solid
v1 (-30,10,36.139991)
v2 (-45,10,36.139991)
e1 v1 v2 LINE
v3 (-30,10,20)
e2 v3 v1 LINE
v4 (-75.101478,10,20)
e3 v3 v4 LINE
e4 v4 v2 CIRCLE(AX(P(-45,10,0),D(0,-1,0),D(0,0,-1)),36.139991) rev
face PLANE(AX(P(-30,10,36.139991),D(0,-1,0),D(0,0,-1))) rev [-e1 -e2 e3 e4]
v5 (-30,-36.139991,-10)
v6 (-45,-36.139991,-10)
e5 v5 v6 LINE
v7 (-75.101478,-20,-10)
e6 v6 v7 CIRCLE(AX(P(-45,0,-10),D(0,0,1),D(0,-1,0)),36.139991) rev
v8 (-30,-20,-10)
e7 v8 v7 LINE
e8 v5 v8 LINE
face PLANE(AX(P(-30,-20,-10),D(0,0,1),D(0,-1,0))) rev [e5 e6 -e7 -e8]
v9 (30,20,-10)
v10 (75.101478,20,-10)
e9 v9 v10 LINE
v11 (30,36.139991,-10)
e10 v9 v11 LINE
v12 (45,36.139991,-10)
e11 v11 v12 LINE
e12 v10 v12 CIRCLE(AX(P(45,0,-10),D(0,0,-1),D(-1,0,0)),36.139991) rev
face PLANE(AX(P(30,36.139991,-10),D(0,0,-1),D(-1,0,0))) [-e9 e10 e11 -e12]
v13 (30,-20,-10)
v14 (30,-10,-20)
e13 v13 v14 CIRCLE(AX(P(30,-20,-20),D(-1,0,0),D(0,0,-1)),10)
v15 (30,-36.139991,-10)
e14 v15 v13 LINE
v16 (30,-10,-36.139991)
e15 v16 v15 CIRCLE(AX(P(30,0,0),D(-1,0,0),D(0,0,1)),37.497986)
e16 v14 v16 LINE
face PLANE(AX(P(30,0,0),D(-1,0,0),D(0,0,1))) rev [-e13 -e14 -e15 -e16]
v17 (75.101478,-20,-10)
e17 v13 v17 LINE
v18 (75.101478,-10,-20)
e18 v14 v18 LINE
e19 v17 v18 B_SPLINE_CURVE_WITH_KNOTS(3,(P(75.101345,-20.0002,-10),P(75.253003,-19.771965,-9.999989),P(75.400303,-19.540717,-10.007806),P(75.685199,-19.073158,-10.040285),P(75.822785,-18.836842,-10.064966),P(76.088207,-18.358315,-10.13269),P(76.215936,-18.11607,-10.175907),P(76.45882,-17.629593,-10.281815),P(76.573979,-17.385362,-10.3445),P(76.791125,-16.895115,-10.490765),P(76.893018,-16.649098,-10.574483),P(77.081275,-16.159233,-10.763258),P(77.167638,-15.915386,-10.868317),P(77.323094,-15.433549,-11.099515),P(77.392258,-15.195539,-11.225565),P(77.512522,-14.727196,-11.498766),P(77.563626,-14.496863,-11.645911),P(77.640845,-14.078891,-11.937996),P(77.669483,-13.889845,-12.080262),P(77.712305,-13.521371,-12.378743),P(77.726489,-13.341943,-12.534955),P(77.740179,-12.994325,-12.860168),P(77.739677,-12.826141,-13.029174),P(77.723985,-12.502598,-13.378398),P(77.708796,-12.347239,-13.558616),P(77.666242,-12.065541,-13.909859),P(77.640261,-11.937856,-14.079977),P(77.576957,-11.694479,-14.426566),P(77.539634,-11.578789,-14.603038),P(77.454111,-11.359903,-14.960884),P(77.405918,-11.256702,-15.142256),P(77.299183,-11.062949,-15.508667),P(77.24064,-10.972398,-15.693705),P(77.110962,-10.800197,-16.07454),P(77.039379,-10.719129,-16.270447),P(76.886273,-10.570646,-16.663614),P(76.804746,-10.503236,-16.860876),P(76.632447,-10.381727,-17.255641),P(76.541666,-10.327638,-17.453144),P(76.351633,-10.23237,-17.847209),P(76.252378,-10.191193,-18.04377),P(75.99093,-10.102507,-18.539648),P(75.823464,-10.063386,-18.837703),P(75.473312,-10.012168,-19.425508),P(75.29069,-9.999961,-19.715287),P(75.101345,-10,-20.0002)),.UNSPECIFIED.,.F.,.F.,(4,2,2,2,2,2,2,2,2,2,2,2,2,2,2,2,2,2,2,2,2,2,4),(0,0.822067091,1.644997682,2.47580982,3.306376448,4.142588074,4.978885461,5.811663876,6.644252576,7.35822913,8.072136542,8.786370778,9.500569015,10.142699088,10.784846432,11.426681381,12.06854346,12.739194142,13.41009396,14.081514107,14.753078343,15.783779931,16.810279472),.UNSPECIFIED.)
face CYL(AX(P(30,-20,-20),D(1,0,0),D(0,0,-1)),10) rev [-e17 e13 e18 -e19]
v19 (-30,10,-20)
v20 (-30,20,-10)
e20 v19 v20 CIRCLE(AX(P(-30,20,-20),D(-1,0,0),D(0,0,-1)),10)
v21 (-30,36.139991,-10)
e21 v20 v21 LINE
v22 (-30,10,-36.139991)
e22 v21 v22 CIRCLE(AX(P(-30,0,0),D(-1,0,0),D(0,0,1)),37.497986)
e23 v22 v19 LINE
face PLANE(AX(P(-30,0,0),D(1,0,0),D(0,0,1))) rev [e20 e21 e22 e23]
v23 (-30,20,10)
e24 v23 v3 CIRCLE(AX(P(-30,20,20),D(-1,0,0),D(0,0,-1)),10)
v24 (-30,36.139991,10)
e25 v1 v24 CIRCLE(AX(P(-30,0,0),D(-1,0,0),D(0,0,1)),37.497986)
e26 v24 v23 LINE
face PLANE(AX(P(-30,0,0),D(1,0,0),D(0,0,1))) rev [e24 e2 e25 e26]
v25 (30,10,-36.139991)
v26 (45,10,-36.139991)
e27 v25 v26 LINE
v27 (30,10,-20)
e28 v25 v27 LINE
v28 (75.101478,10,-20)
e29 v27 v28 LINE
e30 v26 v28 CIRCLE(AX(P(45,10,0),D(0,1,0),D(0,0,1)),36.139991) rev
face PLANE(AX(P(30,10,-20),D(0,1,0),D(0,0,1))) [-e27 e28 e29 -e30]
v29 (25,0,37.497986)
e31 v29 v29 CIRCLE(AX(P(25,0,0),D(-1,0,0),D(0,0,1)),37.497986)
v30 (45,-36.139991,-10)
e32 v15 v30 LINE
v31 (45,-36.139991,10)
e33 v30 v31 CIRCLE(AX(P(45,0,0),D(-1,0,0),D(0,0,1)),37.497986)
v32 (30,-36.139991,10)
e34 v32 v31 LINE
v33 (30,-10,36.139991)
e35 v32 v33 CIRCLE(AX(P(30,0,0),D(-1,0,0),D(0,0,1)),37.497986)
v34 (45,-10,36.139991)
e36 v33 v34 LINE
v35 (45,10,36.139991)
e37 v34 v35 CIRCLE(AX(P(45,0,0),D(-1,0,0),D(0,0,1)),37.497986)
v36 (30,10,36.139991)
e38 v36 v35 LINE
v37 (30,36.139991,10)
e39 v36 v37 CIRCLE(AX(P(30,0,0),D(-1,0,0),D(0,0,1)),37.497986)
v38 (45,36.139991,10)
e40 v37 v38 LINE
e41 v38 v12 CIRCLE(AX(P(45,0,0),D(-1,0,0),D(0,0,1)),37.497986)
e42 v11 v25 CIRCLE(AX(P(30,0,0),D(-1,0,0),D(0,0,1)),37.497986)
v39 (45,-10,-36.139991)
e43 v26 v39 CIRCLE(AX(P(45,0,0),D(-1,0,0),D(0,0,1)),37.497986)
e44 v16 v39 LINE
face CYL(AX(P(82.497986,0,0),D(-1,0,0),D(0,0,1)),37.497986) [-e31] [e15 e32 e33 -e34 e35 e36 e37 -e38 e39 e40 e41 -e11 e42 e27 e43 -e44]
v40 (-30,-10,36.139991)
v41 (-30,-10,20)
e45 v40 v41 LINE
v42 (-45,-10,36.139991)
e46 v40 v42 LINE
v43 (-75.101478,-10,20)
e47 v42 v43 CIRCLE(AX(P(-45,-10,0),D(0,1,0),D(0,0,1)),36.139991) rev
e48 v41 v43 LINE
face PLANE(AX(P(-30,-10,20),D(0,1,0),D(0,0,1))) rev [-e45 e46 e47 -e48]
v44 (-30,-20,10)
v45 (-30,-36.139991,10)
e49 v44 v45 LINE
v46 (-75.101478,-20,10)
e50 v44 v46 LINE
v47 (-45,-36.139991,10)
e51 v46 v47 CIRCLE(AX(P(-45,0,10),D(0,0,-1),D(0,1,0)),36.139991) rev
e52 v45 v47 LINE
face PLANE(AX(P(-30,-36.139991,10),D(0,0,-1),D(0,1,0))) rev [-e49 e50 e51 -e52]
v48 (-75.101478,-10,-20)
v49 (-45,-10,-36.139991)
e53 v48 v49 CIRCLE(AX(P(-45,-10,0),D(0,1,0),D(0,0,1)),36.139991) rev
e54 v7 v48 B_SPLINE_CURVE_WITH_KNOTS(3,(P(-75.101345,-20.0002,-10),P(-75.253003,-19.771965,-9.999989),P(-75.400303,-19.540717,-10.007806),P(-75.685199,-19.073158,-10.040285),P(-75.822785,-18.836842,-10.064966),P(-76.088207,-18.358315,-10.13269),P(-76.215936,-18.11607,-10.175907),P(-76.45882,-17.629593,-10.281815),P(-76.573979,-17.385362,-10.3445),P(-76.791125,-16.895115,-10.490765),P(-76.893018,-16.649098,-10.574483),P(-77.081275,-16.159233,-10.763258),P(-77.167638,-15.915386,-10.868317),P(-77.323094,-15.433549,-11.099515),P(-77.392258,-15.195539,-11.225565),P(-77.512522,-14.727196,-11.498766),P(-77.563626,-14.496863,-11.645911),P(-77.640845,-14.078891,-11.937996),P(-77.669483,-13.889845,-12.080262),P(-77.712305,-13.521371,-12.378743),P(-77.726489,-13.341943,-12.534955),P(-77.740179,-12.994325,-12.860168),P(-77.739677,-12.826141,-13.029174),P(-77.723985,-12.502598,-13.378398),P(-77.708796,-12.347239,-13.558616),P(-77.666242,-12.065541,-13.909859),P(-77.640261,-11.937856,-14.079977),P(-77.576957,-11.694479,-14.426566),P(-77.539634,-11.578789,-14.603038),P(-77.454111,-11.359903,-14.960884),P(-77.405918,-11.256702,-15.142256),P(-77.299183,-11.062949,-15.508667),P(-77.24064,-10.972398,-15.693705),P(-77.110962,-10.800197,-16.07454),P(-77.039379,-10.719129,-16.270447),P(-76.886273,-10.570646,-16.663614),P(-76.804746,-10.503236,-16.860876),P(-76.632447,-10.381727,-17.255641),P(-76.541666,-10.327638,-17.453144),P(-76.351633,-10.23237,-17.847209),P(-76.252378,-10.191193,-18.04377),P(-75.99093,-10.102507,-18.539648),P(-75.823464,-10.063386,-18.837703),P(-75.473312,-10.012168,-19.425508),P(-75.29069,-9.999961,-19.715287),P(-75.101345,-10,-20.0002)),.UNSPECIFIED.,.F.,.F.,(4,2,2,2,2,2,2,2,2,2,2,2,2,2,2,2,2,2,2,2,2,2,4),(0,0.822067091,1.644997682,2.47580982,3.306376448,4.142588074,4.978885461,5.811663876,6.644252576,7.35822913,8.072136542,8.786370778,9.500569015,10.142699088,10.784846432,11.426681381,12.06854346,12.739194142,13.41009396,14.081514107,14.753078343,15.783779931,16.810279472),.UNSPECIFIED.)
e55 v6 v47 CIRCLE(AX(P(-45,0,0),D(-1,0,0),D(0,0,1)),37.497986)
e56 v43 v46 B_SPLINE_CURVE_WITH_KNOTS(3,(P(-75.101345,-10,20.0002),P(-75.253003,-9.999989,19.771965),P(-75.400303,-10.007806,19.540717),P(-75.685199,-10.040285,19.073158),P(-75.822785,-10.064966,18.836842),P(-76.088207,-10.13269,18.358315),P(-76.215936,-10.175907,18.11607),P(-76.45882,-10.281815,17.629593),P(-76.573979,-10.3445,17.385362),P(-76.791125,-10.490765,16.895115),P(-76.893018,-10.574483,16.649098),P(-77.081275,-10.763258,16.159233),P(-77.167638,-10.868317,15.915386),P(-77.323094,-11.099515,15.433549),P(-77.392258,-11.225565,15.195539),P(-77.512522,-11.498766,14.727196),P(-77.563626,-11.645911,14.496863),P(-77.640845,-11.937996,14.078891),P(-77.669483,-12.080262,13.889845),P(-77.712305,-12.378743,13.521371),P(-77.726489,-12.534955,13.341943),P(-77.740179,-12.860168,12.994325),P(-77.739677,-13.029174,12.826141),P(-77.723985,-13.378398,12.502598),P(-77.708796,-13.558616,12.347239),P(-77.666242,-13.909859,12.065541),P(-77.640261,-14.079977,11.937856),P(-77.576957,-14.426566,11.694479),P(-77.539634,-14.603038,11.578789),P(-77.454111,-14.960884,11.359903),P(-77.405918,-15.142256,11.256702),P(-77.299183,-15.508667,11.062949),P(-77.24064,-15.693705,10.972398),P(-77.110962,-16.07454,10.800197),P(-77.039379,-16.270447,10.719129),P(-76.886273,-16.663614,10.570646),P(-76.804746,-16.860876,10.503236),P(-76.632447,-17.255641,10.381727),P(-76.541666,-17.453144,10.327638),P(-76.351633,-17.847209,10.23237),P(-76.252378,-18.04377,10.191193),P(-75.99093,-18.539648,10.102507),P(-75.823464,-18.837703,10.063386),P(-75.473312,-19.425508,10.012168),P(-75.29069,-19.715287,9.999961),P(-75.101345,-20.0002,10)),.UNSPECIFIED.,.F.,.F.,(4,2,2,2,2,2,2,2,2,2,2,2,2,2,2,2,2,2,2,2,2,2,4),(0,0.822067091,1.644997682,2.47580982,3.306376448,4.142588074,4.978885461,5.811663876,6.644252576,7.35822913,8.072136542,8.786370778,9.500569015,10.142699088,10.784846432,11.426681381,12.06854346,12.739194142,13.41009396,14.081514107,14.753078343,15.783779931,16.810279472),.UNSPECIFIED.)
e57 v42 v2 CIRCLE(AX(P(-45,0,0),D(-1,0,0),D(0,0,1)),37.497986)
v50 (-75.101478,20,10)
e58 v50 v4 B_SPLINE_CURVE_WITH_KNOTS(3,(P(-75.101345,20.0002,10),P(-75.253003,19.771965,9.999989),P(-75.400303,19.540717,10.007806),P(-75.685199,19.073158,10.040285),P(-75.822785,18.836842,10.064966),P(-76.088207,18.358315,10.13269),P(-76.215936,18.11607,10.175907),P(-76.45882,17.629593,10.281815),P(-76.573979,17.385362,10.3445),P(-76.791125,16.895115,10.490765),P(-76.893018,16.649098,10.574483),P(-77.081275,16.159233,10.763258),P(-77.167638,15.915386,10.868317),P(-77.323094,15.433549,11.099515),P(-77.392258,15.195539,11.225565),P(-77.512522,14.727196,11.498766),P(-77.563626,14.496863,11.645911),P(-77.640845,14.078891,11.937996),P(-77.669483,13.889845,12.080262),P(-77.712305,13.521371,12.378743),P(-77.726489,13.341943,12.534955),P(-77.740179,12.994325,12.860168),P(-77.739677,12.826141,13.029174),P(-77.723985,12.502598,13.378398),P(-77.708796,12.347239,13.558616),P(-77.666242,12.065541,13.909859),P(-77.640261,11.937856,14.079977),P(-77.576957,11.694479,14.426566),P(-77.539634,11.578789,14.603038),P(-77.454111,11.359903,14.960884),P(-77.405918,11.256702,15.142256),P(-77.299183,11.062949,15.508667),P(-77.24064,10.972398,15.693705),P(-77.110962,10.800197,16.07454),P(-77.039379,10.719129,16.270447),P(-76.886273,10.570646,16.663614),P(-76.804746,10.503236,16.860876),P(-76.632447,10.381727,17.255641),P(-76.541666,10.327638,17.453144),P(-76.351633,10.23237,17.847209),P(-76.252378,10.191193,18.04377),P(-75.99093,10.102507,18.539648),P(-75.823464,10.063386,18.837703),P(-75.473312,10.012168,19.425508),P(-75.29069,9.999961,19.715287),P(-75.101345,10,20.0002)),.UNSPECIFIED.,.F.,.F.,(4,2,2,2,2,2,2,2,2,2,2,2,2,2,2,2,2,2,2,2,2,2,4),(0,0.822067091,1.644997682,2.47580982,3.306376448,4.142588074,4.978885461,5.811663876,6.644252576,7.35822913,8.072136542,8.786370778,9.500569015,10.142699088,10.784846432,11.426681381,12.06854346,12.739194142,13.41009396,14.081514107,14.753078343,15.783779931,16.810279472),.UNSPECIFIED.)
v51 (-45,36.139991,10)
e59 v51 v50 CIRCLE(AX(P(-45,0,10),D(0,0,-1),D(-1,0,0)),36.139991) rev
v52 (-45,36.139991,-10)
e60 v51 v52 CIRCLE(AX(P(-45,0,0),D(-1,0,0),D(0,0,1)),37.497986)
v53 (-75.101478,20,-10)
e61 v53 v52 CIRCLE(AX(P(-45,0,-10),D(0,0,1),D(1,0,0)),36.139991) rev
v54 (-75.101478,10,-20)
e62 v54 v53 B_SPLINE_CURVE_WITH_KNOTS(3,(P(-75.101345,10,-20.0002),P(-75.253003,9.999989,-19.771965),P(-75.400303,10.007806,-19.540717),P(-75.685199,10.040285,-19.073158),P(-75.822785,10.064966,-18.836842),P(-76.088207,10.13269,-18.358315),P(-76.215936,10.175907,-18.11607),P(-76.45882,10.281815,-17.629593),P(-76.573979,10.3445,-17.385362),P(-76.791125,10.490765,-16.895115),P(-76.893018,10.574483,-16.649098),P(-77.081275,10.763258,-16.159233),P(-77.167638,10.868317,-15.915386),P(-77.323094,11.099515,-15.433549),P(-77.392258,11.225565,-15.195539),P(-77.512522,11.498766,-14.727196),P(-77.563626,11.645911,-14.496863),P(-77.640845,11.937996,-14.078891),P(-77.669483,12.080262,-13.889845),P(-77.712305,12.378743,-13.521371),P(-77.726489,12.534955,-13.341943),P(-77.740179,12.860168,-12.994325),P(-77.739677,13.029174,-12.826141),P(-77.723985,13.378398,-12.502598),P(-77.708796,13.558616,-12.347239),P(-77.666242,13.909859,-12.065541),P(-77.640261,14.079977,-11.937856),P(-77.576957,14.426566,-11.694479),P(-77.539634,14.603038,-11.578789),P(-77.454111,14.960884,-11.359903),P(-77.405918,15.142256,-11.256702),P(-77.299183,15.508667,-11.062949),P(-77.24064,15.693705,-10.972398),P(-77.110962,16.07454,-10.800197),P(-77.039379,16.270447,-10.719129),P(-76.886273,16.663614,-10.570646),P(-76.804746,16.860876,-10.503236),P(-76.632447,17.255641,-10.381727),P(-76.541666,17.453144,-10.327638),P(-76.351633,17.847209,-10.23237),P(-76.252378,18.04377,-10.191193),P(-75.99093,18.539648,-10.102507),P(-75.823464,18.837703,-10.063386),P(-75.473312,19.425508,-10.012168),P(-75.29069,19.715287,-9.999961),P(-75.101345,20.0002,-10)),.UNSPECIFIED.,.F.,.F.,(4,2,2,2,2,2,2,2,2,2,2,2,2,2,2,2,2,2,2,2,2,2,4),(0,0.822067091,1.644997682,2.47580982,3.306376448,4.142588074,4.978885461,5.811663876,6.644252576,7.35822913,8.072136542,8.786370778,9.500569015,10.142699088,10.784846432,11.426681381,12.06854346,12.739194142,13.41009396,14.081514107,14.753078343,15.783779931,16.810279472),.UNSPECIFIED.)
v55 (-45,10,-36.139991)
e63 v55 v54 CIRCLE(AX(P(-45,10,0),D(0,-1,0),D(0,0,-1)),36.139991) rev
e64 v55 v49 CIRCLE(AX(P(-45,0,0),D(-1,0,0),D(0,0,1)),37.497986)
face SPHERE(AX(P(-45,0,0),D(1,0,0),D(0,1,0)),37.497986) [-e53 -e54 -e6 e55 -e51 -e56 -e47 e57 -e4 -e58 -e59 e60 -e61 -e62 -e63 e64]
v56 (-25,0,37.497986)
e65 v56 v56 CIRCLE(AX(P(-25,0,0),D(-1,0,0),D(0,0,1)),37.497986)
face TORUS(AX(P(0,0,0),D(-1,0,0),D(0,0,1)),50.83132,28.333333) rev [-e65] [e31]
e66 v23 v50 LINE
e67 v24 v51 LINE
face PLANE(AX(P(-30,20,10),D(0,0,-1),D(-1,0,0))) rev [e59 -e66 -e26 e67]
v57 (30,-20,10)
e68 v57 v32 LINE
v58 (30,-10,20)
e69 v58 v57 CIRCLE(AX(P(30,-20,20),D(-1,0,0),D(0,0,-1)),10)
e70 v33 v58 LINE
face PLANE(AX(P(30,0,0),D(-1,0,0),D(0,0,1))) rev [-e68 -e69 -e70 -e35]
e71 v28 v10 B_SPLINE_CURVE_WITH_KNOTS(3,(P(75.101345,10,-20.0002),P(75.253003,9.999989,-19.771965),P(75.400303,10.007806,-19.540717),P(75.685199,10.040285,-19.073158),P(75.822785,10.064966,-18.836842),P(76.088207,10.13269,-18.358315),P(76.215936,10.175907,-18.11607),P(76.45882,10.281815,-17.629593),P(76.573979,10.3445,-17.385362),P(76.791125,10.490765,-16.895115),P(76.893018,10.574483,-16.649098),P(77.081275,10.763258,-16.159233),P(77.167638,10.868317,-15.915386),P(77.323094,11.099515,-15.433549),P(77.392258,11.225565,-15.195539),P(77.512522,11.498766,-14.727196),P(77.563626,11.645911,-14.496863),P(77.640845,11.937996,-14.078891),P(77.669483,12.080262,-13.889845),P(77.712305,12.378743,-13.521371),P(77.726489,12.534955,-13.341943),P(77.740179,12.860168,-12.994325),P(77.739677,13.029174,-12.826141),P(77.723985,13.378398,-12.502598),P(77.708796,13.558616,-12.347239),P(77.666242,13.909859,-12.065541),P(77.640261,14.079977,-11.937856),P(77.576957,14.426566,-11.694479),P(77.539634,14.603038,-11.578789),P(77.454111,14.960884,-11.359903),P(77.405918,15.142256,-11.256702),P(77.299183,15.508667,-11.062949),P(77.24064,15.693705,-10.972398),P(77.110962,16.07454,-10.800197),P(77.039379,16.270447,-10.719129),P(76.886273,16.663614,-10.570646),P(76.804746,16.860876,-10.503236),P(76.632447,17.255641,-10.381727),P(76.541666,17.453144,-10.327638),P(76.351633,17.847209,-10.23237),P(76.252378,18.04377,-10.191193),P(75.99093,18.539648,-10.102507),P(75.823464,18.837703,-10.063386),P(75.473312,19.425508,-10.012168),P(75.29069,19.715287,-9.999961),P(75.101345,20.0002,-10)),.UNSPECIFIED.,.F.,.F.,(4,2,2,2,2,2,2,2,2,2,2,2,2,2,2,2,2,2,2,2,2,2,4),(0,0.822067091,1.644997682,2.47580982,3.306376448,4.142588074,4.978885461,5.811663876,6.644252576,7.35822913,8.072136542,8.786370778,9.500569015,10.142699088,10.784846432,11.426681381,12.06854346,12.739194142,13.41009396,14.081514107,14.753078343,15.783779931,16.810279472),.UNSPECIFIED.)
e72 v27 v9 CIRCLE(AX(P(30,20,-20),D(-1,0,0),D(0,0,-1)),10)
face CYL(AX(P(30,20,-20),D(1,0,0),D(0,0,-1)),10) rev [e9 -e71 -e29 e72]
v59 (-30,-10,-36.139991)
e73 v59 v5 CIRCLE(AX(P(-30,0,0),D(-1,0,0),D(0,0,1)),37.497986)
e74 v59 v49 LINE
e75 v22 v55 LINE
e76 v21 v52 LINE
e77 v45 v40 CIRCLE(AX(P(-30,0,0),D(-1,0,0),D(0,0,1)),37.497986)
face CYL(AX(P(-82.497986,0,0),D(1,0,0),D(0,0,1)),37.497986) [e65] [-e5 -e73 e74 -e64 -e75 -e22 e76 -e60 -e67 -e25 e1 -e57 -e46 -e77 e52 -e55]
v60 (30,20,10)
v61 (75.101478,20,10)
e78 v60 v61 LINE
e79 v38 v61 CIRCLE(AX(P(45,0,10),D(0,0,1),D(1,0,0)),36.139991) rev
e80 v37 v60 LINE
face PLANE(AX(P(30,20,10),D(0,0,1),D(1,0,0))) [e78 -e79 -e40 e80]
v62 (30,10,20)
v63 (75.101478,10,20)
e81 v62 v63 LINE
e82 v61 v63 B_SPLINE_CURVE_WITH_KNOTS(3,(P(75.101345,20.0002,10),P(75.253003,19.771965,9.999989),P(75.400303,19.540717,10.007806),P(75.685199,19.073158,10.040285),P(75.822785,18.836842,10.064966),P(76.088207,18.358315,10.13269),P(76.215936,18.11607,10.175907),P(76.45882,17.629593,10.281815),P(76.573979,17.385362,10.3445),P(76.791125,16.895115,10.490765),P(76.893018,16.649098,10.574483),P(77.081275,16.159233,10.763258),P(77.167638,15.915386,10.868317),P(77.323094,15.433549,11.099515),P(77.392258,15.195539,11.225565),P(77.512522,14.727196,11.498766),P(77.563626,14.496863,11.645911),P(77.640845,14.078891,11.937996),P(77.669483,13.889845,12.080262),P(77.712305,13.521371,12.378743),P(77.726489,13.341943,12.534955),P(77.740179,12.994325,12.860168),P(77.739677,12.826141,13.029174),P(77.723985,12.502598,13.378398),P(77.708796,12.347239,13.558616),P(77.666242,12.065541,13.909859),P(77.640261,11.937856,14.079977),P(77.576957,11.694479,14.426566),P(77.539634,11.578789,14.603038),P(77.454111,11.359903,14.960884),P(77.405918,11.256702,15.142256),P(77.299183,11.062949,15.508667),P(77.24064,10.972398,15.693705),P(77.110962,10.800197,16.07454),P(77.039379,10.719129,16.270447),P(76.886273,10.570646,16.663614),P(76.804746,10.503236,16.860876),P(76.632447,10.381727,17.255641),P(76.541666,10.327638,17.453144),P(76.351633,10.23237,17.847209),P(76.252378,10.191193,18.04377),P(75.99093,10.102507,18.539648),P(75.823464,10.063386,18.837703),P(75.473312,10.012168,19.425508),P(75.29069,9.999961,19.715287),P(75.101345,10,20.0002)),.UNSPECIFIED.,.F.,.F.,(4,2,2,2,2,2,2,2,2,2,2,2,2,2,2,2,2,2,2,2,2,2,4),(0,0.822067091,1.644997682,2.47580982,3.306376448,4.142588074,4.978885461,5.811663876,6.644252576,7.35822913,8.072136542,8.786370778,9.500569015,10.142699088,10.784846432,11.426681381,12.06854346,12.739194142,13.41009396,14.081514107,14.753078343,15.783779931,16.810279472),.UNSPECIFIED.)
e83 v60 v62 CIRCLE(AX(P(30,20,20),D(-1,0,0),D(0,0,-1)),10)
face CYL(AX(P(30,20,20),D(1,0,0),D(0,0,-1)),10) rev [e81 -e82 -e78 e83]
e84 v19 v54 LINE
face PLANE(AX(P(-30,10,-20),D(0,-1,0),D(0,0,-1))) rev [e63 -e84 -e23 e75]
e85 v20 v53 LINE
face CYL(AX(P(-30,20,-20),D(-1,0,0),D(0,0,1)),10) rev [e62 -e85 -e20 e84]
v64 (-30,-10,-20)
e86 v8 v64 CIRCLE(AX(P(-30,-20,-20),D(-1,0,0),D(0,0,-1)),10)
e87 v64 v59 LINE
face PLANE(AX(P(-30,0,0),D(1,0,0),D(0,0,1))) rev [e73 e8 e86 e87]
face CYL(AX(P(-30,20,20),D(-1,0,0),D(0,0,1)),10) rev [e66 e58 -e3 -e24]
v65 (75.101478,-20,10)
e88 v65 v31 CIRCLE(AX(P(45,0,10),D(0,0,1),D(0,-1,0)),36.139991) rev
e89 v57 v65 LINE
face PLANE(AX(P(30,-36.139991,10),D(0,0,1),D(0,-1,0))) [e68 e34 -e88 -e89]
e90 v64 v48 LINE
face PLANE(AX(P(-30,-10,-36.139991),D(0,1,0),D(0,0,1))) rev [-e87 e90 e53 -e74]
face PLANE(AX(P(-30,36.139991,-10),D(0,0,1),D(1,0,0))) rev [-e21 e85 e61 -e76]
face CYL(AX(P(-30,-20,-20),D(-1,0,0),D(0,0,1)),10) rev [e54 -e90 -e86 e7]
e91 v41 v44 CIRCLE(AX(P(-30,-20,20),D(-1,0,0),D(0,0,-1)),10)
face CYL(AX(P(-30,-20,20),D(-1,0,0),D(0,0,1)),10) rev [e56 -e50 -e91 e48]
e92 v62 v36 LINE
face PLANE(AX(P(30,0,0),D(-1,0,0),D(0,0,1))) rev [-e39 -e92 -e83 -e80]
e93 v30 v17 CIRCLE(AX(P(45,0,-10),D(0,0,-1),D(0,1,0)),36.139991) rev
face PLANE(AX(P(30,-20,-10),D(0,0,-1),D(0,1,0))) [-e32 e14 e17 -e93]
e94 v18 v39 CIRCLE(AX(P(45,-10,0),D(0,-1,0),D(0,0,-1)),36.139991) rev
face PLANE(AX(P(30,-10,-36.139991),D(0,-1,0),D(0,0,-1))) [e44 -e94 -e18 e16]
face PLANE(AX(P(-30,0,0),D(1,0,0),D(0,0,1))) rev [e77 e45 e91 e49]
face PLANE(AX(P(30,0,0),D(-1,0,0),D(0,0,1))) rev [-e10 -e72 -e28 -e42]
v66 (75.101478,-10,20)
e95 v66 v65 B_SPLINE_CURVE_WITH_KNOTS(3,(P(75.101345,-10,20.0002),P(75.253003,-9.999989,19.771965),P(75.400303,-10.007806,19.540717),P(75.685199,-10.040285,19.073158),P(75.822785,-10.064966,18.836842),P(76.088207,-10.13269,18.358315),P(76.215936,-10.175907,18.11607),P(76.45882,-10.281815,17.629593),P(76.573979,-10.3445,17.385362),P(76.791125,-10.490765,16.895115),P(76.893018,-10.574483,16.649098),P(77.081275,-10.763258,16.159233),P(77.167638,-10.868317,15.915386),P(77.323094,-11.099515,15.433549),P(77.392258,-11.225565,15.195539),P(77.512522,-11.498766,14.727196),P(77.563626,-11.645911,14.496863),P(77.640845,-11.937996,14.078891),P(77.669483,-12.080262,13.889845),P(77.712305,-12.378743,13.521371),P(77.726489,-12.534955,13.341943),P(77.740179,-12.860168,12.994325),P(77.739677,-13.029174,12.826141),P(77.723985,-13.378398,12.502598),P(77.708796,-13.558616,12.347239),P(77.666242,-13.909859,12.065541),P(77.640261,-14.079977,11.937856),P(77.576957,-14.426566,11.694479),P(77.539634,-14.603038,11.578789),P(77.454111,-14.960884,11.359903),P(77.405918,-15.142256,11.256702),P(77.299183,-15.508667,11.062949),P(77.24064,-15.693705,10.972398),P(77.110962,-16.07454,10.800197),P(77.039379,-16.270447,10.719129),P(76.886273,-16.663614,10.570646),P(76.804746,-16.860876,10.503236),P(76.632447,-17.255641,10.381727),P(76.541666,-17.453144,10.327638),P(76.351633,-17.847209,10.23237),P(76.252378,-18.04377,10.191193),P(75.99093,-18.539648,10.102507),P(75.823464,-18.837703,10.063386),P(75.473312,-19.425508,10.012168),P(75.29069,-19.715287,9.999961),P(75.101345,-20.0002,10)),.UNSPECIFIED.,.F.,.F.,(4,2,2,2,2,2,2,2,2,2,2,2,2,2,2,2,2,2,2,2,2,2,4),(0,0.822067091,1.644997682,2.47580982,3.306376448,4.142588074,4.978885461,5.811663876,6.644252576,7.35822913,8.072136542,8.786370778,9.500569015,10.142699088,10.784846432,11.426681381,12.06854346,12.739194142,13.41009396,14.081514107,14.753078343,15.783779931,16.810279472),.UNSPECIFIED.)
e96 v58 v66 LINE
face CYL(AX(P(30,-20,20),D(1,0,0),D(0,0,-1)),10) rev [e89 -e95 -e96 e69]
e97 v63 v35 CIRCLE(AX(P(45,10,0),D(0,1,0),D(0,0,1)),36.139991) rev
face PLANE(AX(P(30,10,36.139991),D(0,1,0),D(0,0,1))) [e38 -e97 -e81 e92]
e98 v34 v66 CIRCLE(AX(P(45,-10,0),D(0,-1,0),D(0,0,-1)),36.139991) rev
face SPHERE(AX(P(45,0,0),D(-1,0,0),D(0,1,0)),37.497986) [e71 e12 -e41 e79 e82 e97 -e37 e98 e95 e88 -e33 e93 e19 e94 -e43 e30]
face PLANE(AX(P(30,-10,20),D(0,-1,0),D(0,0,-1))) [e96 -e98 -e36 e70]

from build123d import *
from build123d.topology import SkipClean

# Parameters (mm, degrees)
CUT_EXTRUDE_START   = -30
CUT_EXTRUDE_1_DEPTH = 52.5


with BuildPart() as part:
    # 草图1 → 旋转3 (revolve)
    with BuildSketch(Plane.XY):
        with BuildLine():
            Line((0, 0), (82.497986241, 0))
            ThreePointArc((82.497986241, 0), (71.515080352, 26.515080352), (45, 37.497986241))
            Line((45, 37.497986241), (25, 37.497986241))
            ThreePointArc((25, 37.497986241), (14.577379737, 26.535686679), (0, 22.497986241))
            Line((0, 22.497986241), (0, 0))
        make_face()
    revolve_3 = revolve(axis=Axis((82.497986241, 0, 0), (1, 0, 0)))

    # 草图2 → 切除-拉伸1 (cut)
    with BuildSketch(Plane.ZY.offset(CUT_EXTRUDE_START)):
        with BuildLine():
            Line((-10, 36.139991314), (-10, 20))
            ThreePointArc((-10, 20), (-12.928932188, 12.928932188), (-20, 10))
            Line((-20, 10), (-36.139991314, 10))
            ThreePointArc((-36.139991314, 10), (-26.515080352, 26.515080352), (-10, 36.139991314))
        make_face()
        with BuildLine():
            Line((36.139991314, 10), (20, 10))
            ThreePointArc((20, 10), (12.928932188, 12.928932188), (10, 20))
            Line((10, 20), (10, 36.139991314))
            ThreePointArc((10, 36.139991314), (26.515080352, 26.515080352), (36.139991314, 10))
        make_face()
        with BuildLine():
            Line((10, -36.139991314), (10, -20))
            ThreePointArc((10, -20), (12.928932188, -12.928932188), (20, -10))
            Line((20, -10), (36.139991314, -10))
            ThreePointArc((36.139991314, -10), (26.515080352, -26.515080352), (10, -36.139991314))
        make_face()
        with BuildLine():
            Line((-36.139991314, -10), (-20, -10))
            ThreePointArc((-20, -10), (-12.928932188, -12.928932188), (-10, -20))
            Line((-10, -20), (-10, -36.139991314))
            ThreePointArc((-10, -36.139991314), (-26.515080352, -26.515080352), (-36.139991314, -10))
        make_face()
    cut_extrude_1 = extrude(amount=-CUT_EXTRUDE_1_DEPTH, mode=Mode.SUBTRACT)

    # 镜向1: 旋转3, 切除-拉伸1 across plane
    with SkipClean():  # the faces are left unmerged after this step: merging them gives an invalid solid
        add(revolve_3.mirror(Plane(origin=(0, 0, 0), x_dir=(0, 0, 1), z_dir=(1, 0, 0))))
        add(cut_extrude_1.mirror(Plane(origin=(0, 0, 0), x_dir=(0, 0, 1), z_dir=(1, 0, 0))), mode=Mode.SUBTRACT)


solid = part.part
